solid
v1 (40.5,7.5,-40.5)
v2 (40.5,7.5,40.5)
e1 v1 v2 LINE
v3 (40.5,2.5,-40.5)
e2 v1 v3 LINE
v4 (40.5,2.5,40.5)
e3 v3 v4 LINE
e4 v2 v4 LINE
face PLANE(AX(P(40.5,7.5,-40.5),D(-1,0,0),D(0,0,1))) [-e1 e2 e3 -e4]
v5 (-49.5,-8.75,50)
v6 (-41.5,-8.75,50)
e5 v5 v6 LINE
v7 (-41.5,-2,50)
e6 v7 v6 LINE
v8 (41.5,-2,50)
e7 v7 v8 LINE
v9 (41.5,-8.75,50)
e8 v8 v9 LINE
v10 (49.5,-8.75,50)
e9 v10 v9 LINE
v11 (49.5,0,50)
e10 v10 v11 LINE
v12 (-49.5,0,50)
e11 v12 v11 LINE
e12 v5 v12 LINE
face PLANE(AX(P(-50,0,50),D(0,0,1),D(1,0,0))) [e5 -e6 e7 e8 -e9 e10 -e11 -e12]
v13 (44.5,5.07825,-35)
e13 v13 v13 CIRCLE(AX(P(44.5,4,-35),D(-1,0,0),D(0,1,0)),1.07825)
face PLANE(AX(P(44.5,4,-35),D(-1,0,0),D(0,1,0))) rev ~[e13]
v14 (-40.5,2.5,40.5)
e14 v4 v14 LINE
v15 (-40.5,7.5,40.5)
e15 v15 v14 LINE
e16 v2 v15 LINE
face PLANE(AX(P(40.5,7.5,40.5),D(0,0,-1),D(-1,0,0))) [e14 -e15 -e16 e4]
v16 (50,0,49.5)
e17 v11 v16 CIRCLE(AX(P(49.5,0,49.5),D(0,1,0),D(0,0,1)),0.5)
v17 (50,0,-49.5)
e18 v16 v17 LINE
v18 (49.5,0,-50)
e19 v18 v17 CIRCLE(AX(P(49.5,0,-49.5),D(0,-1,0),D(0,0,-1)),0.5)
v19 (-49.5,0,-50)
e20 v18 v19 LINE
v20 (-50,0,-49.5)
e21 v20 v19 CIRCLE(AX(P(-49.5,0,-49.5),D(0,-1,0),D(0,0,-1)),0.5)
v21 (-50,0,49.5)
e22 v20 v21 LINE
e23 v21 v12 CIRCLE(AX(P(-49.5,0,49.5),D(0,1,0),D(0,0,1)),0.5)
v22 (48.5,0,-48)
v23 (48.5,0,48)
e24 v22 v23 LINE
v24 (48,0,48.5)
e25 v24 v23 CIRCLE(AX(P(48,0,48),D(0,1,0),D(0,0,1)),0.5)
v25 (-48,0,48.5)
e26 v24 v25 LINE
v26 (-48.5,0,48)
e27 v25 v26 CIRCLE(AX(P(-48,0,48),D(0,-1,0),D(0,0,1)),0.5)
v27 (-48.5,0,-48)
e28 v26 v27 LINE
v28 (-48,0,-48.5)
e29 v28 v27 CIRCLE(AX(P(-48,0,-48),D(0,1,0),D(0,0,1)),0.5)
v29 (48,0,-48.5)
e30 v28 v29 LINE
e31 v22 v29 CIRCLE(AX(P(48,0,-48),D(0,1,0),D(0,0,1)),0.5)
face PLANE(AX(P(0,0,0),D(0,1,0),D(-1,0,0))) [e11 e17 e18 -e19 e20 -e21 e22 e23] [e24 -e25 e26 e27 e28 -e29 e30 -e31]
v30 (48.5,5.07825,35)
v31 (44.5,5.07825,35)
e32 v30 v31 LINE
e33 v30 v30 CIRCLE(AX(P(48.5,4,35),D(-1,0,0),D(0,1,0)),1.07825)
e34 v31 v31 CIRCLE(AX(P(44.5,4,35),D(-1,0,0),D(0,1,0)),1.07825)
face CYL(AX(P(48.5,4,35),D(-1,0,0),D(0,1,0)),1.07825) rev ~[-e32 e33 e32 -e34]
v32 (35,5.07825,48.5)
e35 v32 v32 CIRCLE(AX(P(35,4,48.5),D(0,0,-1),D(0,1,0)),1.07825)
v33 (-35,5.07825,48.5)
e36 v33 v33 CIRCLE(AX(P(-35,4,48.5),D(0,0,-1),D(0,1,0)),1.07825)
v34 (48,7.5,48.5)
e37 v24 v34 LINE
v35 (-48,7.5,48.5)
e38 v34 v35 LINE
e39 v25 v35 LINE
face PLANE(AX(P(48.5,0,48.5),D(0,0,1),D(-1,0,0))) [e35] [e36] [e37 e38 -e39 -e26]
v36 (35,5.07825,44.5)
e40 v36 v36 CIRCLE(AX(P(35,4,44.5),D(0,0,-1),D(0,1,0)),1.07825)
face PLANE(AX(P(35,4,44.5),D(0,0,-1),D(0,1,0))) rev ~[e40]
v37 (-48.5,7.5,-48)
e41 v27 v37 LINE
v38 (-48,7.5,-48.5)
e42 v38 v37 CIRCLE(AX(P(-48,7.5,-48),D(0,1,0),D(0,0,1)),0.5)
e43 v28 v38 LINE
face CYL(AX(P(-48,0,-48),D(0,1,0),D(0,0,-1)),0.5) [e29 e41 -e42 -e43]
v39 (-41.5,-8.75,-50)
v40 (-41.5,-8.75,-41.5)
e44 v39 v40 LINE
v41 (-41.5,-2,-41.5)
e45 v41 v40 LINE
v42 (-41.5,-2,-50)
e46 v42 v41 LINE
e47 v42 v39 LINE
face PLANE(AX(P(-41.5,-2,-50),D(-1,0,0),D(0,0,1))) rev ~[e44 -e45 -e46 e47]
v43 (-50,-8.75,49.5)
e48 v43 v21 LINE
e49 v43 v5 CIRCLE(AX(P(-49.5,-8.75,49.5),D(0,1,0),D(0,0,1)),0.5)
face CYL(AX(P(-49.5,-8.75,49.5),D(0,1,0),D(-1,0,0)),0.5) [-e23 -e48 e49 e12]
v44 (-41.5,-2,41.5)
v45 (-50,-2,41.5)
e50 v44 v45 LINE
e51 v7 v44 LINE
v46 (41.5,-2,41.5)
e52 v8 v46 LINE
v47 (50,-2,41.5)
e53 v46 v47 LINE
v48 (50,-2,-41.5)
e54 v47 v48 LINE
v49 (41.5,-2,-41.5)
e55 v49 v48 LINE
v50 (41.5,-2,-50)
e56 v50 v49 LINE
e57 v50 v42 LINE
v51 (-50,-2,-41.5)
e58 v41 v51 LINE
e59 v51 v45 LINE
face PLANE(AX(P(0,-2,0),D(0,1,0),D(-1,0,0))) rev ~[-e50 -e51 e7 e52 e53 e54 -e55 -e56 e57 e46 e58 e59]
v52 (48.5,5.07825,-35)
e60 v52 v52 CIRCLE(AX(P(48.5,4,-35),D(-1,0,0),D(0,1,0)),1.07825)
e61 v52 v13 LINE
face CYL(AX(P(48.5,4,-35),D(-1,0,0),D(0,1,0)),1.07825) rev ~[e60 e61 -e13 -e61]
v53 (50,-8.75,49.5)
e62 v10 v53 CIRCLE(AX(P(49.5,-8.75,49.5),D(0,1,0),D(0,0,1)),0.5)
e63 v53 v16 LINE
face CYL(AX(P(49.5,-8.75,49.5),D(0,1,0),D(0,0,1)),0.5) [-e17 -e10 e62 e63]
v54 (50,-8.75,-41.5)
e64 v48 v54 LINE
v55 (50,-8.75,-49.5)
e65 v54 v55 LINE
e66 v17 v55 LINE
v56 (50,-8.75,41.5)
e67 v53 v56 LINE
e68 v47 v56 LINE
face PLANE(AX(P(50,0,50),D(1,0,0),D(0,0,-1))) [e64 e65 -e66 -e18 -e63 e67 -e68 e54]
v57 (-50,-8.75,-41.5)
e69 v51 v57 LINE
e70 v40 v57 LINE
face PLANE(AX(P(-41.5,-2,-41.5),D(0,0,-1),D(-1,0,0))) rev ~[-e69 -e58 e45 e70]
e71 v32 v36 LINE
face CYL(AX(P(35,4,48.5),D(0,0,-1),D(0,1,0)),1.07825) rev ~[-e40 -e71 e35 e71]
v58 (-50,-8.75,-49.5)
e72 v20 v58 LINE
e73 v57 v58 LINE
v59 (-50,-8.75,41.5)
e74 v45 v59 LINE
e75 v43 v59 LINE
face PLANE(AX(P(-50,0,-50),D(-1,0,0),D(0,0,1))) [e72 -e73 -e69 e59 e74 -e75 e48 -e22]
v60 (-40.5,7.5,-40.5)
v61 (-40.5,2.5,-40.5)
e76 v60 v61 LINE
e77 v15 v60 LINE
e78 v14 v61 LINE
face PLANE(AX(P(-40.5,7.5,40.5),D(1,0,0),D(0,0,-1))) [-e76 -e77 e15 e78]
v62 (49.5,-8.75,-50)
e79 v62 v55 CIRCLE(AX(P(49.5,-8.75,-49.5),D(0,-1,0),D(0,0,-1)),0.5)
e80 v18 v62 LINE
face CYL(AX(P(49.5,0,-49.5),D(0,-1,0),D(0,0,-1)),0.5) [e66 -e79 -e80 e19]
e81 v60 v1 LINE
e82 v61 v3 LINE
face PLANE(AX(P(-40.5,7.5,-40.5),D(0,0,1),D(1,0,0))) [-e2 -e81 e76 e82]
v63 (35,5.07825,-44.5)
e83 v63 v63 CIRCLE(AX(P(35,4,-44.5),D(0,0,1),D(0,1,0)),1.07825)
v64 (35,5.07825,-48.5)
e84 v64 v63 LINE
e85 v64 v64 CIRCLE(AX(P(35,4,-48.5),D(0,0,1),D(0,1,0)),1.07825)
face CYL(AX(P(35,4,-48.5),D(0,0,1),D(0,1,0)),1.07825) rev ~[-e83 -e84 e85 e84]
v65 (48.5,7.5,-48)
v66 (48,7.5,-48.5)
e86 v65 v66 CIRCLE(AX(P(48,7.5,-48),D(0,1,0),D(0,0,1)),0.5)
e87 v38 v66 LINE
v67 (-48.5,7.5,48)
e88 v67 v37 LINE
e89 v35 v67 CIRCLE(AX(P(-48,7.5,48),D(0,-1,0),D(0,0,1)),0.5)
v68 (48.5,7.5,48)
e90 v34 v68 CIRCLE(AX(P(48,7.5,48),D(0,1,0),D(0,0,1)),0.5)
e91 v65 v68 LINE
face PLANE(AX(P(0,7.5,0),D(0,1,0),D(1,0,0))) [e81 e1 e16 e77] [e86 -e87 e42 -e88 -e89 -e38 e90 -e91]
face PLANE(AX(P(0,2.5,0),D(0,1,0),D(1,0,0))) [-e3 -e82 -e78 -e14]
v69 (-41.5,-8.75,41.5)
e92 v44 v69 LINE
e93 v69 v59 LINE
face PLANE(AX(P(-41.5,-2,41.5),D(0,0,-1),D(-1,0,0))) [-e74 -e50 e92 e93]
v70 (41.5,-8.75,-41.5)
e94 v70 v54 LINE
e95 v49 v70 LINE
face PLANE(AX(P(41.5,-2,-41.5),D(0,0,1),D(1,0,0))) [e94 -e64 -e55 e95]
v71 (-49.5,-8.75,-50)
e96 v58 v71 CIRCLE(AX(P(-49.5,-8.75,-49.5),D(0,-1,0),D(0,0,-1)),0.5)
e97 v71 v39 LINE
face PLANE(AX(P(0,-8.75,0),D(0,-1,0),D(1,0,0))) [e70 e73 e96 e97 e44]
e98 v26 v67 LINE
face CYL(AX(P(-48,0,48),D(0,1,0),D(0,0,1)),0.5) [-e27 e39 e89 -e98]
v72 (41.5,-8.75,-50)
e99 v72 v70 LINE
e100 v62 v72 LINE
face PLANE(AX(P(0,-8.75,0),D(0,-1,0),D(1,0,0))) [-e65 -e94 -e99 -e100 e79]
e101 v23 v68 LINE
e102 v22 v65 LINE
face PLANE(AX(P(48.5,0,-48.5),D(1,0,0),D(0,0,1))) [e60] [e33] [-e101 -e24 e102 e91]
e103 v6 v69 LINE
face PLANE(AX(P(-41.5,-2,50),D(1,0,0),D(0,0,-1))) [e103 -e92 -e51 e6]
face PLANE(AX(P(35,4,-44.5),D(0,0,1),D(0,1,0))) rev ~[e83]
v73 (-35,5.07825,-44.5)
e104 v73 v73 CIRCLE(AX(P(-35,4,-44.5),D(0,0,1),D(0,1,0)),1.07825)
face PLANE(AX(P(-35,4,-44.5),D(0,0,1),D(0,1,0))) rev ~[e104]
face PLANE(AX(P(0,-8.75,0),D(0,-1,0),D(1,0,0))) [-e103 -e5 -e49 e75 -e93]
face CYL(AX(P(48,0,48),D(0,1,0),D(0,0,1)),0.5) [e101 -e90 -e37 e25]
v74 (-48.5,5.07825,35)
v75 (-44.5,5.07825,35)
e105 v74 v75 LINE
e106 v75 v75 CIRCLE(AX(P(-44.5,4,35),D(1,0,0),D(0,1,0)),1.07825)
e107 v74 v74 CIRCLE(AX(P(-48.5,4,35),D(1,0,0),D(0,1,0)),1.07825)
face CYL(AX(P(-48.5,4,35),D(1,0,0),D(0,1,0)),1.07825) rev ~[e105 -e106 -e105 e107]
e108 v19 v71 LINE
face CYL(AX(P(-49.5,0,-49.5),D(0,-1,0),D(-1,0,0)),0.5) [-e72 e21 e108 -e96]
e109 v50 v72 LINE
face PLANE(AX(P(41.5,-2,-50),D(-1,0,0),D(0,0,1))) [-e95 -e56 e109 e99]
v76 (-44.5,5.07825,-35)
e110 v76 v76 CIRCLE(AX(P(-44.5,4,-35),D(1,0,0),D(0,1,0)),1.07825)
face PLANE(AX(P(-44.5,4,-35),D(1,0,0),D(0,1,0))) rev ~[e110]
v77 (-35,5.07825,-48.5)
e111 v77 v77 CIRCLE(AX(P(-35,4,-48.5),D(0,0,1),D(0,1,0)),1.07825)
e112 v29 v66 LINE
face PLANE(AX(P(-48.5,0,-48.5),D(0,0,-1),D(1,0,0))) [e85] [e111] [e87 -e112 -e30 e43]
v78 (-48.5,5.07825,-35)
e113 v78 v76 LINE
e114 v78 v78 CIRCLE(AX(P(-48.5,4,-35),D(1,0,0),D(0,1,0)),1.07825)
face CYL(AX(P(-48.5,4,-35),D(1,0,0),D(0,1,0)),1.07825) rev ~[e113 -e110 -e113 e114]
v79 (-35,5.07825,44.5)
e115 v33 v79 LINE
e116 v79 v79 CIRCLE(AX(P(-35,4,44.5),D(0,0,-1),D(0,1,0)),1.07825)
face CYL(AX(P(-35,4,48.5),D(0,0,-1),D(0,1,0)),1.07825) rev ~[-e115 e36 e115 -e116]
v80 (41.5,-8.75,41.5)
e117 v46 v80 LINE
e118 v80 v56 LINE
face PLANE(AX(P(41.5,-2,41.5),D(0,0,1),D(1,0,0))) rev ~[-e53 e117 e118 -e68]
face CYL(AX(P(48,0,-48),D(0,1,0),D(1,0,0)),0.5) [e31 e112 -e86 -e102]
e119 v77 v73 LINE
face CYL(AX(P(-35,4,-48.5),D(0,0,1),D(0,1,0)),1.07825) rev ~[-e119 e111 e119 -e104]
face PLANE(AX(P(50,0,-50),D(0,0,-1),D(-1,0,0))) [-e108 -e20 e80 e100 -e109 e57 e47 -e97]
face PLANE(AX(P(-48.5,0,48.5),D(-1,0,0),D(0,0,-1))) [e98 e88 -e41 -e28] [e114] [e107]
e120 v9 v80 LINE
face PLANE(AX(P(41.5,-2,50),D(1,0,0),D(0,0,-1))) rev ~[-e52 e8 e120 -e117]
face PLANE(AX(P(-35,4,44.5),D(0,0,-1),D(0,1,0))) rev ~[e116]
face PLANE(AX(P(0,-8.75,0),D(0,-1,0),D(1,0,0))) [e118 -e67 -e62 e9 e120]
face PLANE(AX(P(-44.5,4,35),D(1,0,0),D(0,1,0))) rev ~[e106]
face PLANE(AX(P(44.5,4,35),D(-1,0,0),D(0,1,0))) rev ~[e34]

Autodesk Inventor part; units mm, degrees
ref_plane "YZ Plane" through (0, 0, 0) normal (1, 0, 0) x (0, 1, 0)
ref_plane "XZ Plane" through (0, 0, 0) normal (0, 1, 0) x (-1, 0, 0)
sketch "Sketch1" plane through (0, 0, 0) normal (0, 1, 0) x (-1, 0, 0)
  line L0 (50, 50) -> (-50, 50)
  line L1 (-50, 50) -> (-50, -50)
  line L2 (-50, -50) -> (50, -50)
  line L3 (50, -50) -> (50, 50)
  point P0 (0, 0)
  dimension "d0" = 100
  dimension "d1" = 100
  dimension "d2" = 50
  dimension "d3" = 50
extrude "Extrusion1" add sketch "Sketch1" against normal blind 2
sketch "Sketch2" plane through (0, -2, 0) normal (0, -1, 0) x (1, 0, 0)
  line L0 (-50, 50) -> (-50, -50) projected
  line L1 (-50, 50) -> (-41.5, 50)
  line L2 (-41.5, 50) -> (-41.5, 41.5)
  line L3 (-41.5, 41.5) -> (-50, 41.5)
  line L4 (-50, 41.5) -> (-50, 50)
  line L5 (0, 0) -> (0, 12.5485) construction
  line L6 (0, 0) -> (11.2114, 0) construction
  line L7 (-50, -50) -> (-50, 50)
  line L8 (-50, -50) -> (-41.5, -50)
  line L9 (-41.5, -50) -> (-41.5, -41.5)
  line L10 (-41.5, -41.5) -> (-50, -41.5)
  line L11 (-50, -41.5) -> (-50, -50)
  line L12 (50, 50) -> (50, -50)
  line L13 (50, 50) -> (41.5, 50)
  line L14 (41.5, 50) -> (41.5, 41.5)
  line L15 (41.5, 41.5) -> (50, 41.5)
  line L16 (50, 41.5) -> (50, 50)
  line L17 (50, -50) -> (50, 50)
  line L18 (50, -50) -> (41.5, -50)
  line L19 (41.5, -50) -> (41.5, -41.5)
  line L20 (41.5, -41.5) -> (50, -41.5)
  line L21 (50, -41.5) -> (50, -50)
  dimension "d6" = 8.5
  dimension "d7" = 8.5
extrude "Extrusion2" add sketch "Sketch2" along normal blind 6.75
sketch "Sketch6" plane through (0, 0, 0) normal (0, 1, 0) x (1, 0, 0)
  line L0 (-50, 50) -> (-50, -50) projected
  line L1 (-50, -50) -> (50, -50) projected
  line L2 (50, 50) -> (-50, 50) projected
  line L3 (50, -50) -> (50, 50) projected
  line L4 (-48.5, -48.5) -> (-48.5, 48.5)
  line L5 (-48.5, 48.5) -> (48.5, 48.5)
  line L6 (48.5, 48.5) -> (48.5, -48.5)
  line L7 (48.5, -48.5) -> (-48.5, -48.5)
  line L8 (-46, 34.8675) -> (-46, -34.8675)
  line L9 (-37.725, -46) -> (37.8675, -46)
  line L10 (37.8675, 46) -> (-37.725, 46)
  line L11 (46, -32.465) -> (46, 31.195)
  line L12 (0, 0) -> (-0.6811, 0) construction
  line L13 (0, 0) -> (0, 0.5483) construction
  line L14 (-37.725, -46) -> (-46, -46)
  line L15 (-46, -46) -> (-46, -34.8675)
  line L16 (-46, 34.8675) -> (-46, 46)
  line L17 (-46, 46) -> (-37.725, 46)
  line L18 (37.8675, 46) -> (46, 46)
  line L19 (46, 46) -> (46, 31.195)
  line L20 (46, -32.465) -> (46, -46)
  line L21 (46, -46) -> (37.8675, -46)
  dimension "d80" = 1.5
  dimension "d81" = 2.5
  dimension "d161" = 2.5
  dimension "d162" = 2.5
  dimension "d173" = 2.5
extrude "Extrusion5" add sketch "Sketch6" along normal blind 7.5 contours L4 L5 L6 L7
ref_plane "Work Plane1" through (-50, 0, -50) normal (0.7071068, 0, -0.7071068) x (0, -1, 0)
fillet "Fillet3" radius 0.5 4 edges at (-50, -4.375, -50) (50, -4.375, -50) (50, -4.375, 50) (-50, -4.375, 50)
fillet "Fillet4" radius 0.5 8 edges at (46, 3.75, -46) (48.5, 3.75, -48.5) (46, 3.75, 46) (48.5, 3.75, 48.5) (-48.5, 3.75, 48.5) (-46, 3.75, 46) (-48.5, 3.75, -48.5) (-46, 3.75, -46)
sketch "Sketch16" plane through (0, 0, 0) normal (0, 1, 0) x (1, 0, 0)
  arc A0 (-45.5, 46) -> (-46, 45.5) centre (-45.5, 45.5) ccw projected
  line L0 (-46, 45.5) -> (-46, -45.5) projected
  arc A1 (-46, -45.5) -> (-45.5, -46) centre (-45.5, -45.5) ccw projected
  line L1 (-45.5, -46) -> (45.5, -46) projected
  arc A2 (45.5, -46) -> (46, -45.5) centre (45.5, -45.5) ccw projected
  line L2 (46, -45.5) -> (46, 45.5) projected
  arc A3 (46, 45.5) -> (45.5, 46) centre (45.5, 45.5) ccw projected
  line L3 (45.5, 46) -> (-45.5, 46) projected
  point P0 (0, 0)
extrude "Extrusion12" add sketch "Sketch16" along normal up to surface (7.5 mm away)
sketch "Sketch17" plane through (48, 0, -48.5) normal (0, 0, -1) x (-1, 0, 0)
  circle A0 centre (83, 4) radius 1.727 projected
  circle A1 centre (13, 4) radius 1.727 projected
  point P0 (48, 0)
hole "Hole5" at (-35, 4, -48.5) at (35, 4, -48.5) direction (0, 0, 1) diameter 2.1565 depth 4 thread size "4-40 UNC" class "2B" standard "ANSI Unified Screw Threads"
pattern_circular "Circular Pattern1" count 4 over 360 about axis through (0, -10, 0) along (0, 1, 0) of "Hole5"
sketch "Sketch18" plane through (0, 7.5, 0) normal (0, 1, 0) x (1, 0, 0)
  arc A0 (-48, 48.5) -> (-48.5, 48) centre (-48, 48) ccw projected
  line L0 (-48.5, 48) -> (-48.5, -48) projected
  arc A1 (-48.5, -48) -> (-48, -48.5) centre (-48, -48) ccw projected
  line L1 (-48, -48.5) -> (48, -48.5) projected
  arc A2 (48, -48.5) -> (48.5, -48) centre (48, -48) ccw projected
  line L2 (48.5, -48) -> (48.5, 48) projected
  arc A3 (48.5, 48) -> (48, 48.5) centre (48, 48) ccw projected
  line L3 (48, 48.5) -> (-48, 48.5) projected
  line L4 (-40.5, -40.5) -> (-40.5, 40.5)
  line L5 (-40.5, 40.5) -> (40.5, 40.5)
  line L6 (40.5, 40.5) -> (40.5, -40.5)
  line L7 (40.5, -40.5) -> (-40.5, -40.5)
  point P0 (0, 0)
  dimension "d239" = 8
extrude "Extrusion13" cut sketch "Sketch18" against normal blind 5 contours L4 L5 L6 L7
equation "\"d2\" = 0.5 * d0"
equation "\"d3\" = 0.5 * d1"
equation "\"d33\" = 0.5 * d31"
equation "\"d36\" = 0.5 * d35"
equation "\"d31\" = 5"
equation "\"d35\" = 5"
properties part number "memesat top panel in progress" material "Aluminum 6061"
